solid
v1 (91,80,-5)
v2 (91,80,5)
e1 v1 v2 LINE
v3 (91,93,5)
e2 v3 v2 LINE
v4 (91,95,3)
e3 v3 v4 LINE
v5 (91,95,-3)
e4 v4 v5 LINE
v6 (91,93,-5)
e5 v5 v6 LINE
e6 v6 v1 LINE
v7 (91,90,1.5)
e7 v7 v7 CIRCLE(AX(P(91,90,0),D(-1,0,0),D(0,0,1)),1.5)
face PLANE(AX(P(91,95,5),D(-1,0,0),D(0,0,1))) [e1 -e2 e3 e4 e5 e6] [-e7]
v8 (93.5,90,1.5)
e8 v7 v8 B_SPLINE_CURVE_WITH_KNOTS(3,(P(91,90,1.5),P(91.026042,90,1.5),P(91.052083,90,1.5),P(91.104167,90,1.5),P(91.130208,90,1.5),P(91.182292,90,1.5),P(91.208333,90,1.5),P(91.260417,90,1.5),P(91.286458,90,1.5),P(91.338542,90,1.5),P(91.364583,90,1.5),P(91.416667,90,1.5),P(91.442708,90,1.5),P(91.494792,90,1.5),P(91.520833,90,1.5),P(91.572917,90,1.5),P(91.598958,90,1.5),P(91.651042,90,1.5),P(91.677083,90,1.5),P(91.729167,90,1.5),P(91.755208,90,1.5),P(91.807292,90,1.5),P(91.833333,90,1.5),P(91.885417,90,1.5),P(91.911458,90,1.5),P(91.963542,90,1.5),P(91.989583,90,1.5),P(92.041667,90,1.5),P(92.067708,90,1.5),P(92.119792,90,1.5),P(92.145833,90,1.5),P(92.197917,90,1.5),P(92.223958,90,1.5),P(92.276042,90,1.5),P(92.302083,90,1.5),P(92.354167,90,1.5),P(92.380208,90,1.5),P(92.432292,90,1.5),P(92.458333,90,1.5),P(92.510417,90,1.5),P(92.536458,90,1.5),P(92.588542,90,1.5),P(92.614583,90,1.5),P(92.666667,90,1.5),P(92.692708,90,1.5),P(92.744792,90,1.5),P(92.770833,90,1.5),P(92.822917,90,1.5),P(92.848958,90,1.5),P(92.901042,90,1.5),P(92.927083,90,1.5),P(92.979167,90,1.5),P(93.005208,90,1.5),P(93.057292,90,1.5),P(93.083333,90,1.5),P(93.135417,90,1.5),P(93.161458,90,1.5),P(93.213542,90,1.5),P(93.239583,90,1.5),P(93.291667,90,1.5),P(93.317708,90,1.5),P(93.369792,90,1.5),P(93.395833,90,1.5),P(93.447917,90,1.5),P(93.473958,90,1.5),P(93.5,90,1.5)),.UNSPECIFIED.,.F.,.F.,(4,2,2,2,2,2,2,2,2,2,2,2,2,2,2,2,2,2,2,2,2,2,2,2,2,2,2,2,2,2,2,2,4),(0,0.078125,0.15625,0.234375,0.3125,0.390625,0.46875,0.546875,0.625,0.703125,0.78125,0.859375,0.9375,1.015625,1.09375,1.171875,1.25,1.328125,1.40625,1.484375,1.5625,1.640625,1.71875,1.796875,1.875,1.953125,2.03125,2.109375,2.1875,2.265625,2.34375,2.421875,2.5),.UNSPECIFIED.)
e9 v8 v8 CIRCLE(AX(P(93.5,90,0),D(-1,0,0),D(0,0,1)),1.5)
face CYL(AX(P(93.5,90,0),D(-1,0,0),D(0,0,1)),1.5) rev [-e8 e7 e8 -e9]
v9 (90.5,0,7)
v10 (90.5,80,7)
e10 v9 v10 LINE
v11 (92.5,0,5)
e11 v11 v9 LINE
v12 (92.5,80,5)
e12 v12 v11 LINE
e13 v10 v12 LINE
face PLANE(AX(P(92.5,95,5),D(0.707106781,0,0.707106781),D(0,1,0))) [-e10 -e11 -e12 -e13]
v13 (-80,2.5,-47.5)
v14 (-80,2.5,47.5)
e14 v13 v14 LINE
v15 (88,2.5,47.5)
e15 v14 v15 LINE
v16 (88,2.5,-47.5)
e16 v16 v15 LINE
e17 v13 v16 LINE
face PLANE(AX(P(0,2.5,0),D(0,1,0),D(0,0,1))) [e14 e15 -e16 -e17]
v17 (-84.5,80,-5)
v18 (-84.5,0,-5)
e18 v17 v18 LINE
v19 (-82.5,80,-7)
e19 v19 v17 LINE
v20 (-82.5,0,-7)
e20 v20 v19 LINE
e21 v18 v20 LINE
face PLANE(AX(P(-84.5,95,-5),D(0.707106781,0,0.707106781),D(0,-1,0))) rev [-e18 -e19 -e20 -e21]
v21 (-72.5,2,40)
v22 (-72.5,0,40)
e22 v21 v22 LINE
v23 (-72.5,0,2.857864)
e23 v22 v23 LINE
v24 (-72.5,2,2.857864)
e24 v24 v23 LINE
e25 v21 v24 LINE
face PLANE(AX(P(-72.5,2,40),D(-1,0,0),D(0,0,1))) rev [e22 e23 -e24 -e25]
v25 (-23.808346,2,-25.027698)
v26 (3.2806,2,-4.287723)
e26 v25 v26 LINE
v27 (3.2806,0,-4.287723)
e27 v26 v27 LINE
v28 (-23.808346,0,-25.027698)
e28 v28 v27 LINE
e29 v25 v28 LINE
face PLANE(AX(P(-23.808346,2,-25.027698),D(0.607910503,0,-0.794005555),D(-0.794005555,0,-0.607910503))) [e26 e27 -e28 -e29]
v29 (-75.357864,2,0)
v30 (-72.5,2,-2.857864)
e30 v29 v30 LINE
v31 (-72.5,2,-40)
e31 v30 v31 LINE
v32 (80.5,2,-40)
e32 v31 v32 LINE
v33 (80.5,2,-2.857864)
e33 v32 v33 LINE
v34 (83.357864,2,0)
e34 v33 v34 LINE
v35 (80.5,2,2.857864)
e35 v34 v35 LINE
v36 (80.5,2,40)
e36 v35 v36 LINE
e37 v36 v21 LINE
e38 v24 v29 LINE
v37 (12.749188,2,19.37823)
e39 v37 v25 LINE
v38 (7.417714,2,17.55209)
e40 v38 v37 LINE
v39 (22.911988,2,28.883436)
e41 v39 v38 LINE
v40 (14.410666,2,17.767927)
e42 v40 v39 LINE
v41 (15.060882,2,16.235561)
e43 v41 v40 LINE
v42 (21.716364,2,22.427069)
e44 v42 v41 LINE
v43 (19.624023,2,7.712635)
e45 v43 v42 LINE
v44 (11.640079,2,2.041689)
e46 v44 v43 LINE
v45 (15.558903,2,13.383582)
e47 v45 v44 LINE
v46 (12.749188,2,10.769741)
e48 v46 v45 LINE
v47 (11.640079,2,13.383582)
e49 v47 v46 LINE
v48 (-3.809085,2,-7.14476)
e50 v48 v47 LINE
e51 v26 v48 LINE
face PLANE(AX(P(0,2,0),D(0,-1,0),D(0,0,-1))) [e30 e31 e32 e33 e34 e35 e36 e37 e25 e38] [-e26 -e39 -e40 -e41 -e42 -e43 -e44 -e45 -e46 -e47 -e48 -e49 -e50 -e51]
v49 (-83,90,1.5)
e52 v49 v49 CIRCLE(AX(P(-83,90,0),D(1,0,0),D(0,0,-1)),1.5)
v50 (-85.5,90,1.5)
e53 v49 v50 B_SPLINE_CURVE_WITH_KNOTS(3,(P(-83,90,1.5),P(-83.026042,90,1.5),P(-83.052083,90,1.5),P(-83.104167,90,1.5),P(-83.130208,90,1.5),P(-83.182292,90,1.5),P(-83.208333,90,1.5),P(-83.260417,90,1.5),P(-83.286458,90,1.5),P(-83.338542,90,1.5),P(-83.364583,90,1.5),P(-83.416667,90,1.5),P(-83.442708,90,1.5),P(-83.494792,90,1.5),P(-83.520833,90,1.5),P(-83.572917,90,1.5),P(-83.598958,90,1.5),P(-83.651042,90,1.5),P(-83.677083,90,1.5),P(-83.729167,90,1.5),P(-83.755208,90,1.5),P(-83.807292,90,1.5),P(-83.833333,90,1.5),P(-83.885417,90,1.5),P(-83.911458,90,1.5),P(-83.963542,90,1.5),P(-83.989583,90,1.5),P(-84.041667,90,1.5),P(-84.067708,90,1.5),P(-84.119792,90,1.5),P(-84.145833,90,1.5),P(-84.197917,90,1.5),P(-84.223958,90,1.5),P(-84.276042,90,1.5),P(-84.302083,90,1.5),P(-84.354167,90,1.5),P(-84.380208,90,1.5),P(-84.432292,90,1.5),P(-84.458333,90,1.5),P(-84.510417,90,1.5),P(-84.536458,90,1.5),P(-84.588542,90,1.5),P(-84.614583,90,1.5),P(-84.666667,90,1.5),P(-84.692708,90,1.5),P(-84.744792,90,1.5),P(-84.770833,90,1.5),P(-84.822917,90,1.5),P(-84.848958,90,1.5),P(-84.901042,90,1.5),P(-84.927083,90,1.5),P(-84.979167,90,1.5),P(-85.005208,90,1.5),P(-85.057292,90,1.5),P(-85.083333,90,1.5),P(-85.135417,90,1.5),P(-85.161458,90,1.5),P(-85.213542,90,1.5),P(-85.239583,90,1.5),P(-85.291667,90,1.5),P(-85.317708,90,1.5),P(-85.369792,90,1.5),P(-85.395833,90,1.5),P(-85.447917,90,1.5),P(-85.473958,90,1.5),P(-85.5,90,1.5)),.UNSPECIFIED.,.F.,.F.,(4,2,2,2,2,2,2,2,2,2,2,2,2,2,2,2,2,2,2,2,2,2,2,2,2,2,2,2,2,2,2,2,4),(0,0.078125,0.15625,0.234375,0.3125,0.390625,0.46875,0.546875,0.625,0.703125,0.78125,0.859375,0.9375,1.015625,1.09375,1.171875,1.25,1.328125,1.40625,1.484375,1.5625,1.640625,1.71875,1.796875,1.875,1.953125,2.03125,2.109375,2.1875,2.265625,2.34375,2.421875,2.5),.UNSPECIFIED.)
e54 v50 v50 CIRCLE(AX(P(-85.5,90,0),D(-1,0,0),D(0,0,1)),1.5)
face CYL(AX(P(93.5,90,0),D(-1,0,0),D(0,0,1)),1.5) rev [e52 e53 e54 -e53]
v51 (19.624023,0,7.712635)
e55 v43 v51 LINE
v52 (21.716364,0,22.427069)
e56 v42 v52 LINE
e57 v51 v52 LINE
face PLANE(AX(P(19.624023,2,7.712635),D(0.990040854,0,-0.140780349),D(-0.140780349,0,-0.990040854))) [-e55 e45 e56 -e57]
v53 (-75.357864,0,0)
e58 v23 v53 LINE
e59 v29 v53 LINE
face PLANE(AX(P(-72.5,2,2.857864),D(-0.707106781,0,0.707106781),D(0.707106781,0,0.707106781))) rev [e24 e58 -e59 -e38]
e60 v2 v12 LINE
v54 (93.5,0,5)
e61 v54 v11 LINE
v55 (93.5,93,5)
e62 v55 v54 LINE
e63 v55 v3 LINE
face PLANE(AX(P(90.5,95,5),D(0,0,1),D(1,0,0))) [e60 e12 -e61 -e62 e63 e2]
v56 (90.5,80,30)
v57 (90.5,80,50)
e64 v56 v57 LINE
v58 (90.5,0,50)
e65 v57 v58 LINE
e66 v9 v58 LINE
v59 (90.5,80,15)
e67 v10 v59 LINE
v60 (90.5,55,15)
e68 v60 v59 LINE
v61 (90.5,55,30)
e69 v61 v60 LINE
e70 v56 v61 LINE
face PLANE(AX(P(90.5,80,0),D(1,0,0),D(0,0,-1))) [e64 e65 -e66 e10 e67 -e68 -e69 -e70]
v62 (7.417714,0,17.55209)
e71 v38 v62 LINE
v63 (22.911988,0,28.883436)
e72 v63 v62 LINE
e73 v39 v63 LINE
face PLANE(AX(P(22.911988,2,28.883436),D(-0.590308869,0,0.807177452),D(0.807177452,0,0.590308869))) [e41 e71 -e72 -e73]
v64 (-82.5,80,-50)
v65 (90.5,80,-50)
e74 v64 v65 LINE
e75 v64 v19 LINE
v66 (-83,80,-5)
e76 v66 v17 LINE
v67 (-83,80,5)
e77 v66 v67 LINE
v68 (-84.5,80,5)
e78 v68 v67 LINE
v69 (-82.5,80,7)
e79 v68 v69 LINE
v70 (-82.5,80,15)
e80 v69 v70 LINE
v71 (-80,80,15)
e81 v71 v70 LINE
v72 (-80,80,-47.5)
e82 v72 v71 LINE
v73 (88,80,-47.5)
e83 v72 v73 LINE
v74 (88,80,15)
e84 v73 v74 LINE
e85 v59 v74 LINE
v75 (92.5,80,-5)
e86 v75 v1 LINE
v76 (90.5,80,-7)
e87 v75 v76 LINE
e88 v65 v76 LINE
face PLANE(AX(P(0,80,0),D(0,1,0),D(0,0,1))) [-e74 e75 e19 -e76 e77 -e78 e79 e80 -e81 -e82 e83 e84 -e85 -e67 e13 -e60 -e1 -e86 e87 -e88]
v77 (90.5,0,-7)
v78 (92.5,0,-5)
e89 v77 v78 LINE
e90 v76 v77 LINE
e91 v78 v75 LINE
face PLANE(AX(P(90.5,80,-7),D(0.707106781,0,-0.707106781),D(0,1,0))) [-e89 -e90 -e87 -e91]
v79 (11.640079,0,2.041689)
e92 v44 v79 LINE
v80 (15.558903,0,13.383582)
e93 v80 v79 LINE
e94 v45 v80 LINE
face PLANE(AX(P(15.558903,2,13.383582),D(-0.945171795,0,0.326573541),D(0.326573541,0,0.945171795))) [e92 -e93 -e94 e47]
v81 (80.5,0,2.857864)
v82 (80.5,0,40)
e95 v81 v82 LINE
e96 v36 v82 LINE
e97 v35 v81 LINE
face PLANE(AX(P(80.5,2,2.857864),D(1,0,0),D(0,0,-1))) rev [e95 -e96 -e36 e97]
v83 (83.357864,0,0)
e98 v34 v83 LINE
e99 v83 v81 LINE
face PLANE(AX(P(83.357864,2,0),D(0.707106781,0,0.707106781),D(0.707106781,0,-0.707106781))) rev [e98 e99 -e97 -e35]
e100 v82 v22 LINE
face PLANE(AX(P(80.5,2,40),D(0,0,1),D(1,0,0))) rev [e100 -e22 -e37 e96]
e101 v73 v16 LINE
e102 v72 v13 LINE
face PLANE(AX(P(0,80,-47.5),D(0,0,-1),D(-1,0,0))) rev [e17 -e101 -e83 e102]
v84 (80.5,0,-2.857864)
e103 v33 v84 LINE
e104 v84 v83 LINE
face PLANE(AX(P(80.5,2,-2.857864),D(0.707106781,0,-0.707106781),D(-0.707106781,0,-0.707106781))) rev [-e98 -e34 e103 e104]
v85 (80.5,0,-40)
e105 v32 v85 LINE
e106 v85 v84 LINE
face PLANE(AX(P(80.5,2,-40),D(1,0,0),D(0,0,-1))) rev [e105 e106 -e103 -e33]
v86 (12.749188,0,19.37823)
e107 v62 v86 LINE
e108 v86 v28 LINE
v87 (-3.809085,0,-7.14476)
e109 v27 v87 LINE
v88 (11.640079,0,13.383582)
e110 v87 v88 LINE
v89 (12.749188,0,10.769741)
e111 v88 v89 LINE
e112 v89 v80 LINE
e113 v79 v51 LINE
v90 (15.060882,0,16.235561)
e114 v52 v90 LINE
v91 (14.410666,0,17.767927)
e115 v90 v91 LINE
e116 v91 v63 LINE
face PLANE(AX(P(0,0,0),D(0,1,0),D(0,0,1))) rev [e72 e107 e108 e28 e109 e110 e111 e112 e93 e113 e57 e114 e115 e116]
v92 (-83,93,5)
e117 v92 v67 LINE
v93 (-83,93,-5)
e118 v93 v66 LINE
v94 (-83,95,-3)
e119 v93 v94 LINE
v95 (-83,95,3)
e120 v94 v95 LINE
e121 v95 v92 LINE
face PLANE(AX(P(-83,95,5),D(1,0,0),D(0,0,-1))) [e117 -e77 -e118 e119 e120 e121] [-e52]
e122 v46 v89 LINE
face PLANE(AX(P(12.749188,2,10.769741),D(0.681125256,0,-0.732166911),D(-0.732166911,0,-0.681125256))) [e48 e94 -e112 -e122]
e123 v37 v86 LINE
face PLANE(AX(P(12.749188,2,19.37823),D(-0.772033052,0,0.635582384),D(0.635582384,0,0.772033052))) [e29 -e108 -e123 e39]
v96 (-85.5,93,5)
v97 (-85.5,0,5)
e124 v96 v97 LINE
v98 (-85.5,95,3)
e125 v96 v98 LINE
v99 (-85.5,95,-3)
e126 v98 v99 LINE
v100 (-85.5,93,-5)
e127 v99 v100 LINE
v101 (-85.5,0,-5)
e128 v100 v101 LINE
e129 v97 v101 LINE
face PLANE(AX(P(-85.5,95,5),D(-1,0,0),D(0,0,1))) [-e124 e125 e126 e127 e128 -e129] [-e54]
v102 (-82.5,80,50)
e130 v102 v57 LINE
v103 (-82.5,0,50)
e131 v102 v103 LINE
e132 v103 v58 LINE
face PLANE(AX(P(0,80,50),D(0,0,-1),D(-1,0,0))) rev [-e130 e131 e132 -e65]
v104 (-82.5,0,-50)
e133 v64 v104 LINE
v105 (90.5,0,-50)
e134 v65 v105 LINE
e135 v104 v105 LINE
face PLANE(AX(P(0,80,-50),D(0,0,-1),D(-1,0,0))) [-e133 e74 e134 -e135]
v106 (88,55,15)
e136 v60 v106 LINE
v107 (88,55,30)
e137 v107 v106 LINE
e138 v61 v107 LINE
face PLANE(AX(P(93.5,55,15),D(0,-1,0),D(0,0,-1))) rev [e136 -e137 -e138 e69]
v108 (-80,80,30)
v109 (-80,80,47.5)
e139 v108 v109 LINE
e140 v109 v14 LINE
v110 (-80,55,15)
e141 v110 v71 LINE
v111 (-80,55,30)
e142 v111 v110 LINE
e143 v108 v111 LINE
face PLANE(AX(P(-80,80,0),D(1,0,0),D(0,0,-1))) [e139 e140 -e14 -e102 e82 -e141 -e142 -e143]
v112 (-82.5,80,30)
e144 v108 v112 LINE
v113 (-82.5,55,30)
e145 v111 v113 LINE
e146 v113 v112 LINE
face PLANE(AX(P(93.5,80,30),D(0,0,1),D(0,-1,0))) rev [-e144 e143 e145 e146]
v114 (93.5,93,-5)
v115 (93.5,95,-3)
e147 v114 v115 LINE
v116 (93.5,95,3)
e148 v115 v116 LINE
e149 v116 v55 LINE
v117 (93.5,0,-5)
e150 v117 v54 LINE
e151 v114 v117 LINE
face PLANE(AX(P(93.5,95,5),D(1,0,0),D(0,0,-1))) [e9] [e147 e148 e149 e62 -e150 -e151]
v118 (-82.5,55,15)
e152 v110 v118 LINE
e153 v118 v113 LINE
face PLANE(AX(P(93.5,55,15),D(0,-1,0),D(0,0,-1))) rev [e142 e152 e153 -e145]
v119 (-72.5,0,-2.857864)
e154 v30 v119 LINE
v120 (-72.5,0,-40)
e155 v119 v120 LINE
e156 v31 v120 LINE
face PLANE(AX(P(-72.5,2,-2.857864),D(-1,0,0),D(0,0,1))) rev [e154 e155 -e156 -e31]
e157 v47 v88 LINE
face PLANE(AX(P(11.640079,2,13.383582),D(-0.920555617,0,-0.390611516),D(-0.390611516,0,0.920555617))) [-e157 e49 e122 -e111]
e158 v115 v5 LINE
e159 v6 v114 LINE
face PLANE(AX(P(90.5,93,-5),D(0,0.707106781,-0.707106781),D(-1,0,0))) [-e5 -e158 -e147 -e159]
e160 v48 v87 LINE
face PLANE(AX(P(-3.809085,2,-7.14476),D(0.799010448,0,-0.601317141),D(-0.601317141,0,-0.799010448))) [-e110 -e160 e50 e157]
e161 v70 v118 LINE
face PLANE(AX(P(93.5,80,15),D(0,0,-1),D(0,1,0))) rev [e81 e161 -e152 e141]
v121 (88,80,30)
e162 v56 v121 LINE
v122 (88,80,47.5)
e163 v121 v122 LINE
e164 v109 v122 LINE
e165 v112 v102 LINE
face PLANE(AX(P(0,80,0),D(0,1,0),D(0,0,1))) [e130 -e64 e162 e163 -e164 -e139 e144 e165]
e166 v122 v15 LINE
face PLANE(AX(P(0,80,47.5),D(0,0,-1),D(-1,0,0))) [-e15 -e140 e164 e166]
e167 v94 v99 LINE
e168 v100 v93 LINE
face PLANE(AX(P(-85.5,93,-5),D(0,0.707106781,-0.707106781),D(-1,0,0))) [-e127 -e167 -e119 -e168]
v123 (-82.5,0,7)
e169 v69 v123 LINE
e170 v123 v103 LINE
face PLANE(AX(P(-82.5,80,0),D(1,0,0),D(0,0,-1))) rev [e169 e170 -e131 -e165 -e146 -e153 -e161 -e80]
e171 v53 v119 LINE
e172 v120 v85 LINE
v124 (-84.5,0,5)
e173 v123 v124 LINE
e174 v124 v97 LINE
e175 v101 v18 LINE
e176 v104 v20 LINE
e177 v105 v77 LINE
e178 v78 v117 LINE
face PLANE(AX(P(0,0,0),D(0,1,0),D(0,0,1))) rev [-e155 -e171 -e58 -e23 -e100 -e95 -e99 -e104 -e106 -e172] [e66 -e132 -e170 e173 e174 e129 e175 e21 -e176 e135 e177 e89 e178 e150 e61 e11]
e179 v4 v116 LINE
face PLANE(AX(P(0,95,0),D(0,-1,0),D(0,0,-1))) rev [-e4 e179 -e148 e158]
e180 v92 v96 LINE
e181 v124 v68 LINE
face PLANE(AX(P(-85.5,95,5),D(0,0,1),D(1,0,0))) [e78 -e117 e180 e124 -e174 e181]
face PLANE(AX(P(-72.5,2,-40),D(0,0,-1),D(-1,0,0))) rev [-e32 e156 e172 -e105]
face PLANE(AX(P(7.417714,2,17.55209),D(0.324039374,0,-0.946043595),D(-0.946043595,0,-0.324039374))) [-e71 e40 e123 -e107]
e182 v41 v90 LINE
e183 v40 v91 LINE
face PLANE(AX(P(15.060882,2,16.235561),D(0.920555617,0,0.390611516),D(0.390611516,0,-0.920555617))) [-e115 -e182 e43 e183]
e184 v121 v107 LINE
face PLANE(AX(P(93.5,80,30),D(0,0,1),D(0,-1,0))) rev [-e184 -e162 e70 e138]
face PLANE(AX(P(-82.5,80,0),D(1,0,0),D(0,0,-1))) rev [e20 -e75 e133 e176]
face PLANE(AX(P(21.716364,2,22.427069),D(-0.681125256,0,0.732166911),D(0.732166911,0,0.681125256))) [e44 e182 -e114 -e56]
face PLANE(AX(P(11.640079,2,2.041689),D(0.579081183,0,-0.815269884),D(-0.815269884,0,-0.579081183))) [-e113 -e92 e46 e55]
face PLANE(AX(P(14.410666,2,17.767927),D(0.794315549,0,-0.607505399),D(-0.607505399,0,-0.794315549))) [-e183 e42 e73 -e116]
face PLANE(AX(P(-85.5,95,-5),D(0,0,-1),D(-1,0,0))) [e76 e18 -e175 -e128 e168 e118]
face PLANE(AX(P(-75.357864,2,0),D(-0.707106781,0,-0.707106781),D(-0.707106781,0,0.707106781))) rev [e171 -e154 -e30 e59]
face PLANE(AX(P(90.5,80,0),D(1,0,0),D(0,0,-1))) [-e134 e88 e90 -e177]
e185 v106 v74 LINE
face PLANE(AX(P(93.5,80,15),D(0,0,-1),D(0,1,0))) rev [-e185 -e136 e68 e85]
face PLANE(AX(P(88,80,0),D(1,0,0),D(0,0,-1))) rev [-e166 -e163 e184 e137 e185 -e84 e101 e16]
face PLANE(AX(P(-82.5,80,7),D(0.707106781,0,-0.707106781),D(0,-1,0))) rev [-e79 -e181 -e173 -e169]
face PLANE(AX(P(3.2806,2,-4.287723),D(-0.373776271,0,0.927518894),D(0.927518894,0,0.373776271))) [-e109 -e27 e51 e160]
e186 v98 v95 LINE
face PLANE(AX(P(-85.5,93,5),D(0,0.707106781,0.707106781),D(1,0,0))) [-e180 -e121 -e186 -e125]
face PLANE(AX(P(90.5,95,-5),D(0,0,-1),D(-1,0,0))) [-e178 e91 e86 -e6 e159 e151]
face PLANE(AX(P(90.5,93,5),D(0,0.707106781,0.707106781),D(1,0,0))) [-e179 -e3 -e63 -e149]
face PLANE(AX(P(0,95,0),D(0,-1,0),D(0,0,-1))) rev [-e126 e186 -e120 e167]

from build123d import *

# Parameters (mm, degrees)
SKETCH1_W           = 173
SKETCH1_H           = 100
BOSS_EXTRUDE1_DEPTH = 80
SHELL2_T            = -2.5
SKETCH3_W           = 3
SKETCH3_H           = 10
BOSS_EXTRUDE2_DEPTH = 95
CHAMFER1_SIZE       = 2
MOVE_FACE1_BY       = 0.5
MOVE_FACE2_BY       = 0.5
SKETCH4_R           = 1.5
CUT_EXTRUDE1_DEPTH  = 209.724699066
CUT_EXTRUDE3_DEPTH  = 2
SKETCH6_W           = 15
SKETCH6_H           = 25
CUT_EXTRUDE4_DEPTH  = 207.157706623


# Read off the part's stored shape, not the designer's step: Cut-Extrude3
with BuildPart() as part:
    # Sketch1 → Boss-Extrude1 (new body)
    with BuildSketch(Plane(origin=(0, 0, 0), x_dir=(1, 0, 0), z_dir=(0, 1, 0))):
        with Locations((4, 0)):
            Rectangle(SKETCH1_W, SKETCH1_H)
    extrude(amount=BOSS_EXTRUDE1_DEPTH)

    # Shell2
    shell2_openings = [part.faces().sort_by_distance(p)[0] for p in [
        (4, 80, 0),
    ]]
    offset(amount=SHELL2_T, openings=shell2_openings, kind=Kind.INTERSECTION)

    # Sketch3 → Boss-Extrude2 (add)
    with BuildSketch(Plane.XZ):
        with Locations((-84, 0)):
            Rectangle(SKETCH3_W, SKETCH3_H)
        with Locations((92, 0)):
            Rectangle(SKETCH3_W, SKETCH3_H)
    extrude(amount=-BOSS_EXTRUDE2_DEPTH)

    # Chamfer1
    chamfer1_edges = [part.edges().sort_by_distance(p)[0] for p in [
        (90.5, 40, 5),
        (90.5, 40, -5),
        (-82.5, 40, -5),
        (-82.5, 40, 5),
        (92, 95, 5),
        (92, 95, -5),
        (-84, 95, -5),
        (-84, 95, 5),
    ]]
    chamfer(chamfer1_edges, length=CHAMFER1_SIZE)

    # Move Face1: a face moved inward by 0.5
    extrude(part.faces().sort_by_distance((-82.5, 87.312785388, 0))[0], amount=MOVE_FACE1_BY, dir=(-1, 0, 0), mode=Mode.SUBTRACT)

    # Move Face2: a face moved inward by 0.5
    extrude(part.faces().sort_by_distance((90.5, 87.312785388, 0))[0], amount=MOVE_FACE2_BY, dir=(1, 0, 0), mode=Mode.SUBTRACT)

    # Sketch4 → Cut-Extrude1 (cut, through all)
    with BuildSketch(Plane.ZY.offset(85.5)):
        with Locations((0, 90)):
            Circle(SKETCH4_R)
    extrude(amount=-CUT_EXTRUDE1_DEPTH, mode=Mode.SUBTRACT)

    # Cut-Extrude3 outline → Cut-Extrude3 (cut)
    with BuildSketch(Plane(origin=(0, 0, 0), x_dir=(1, 0, 0), z_dir=(0, 1, 0))):
        Polygon((80.5, 2.857864376), (80.5, 40), (-72.5, 40), (-72.5, 2.857864376), (-75.357864376, 0), (-72.5, -2.857864376), (-72.5, -40), (80.5, -40), (80.5, -2.857864376), (83.357864376, 0), align=None)
        Polygon((7.417714413, -17.552090263), (12.749188197, -19.378229604), (-23.808346413, 25.027697518), (3.280599797, 4.287723077), (-3.809085344, 7.144760372), (11.640079291, -13.383581677), (12.749188197, -10.769740582), (15.558903364, -13.383581677), (11.640079291, -2.041689211), (19.62402318, -7.712635444), (21.716364262, -22.427069466), (15.060881541, -16.235561356), (14.410666008, -17.767926727), (22.911987737, -28.883436233), align=None, mode=Mode.SUBTRACT)
    extrude(amount=CUT_EXTRUDE3_DEPTH, mode=Mode.SUBTRACT)

    # Sketch6 → Cut-Extrude4 (cut, through all)
    with BuildSketch(Plane.ZY.offset(82.5)):
        with Locations((22.5, 67.5)):
            Rectangle(SKETCH6_W, SKETCH6_H)
    extrude(amount=-CUT_EXTRUDE4_DEPTH, mode=Mode.SUBTRACT)


solid = part.part
